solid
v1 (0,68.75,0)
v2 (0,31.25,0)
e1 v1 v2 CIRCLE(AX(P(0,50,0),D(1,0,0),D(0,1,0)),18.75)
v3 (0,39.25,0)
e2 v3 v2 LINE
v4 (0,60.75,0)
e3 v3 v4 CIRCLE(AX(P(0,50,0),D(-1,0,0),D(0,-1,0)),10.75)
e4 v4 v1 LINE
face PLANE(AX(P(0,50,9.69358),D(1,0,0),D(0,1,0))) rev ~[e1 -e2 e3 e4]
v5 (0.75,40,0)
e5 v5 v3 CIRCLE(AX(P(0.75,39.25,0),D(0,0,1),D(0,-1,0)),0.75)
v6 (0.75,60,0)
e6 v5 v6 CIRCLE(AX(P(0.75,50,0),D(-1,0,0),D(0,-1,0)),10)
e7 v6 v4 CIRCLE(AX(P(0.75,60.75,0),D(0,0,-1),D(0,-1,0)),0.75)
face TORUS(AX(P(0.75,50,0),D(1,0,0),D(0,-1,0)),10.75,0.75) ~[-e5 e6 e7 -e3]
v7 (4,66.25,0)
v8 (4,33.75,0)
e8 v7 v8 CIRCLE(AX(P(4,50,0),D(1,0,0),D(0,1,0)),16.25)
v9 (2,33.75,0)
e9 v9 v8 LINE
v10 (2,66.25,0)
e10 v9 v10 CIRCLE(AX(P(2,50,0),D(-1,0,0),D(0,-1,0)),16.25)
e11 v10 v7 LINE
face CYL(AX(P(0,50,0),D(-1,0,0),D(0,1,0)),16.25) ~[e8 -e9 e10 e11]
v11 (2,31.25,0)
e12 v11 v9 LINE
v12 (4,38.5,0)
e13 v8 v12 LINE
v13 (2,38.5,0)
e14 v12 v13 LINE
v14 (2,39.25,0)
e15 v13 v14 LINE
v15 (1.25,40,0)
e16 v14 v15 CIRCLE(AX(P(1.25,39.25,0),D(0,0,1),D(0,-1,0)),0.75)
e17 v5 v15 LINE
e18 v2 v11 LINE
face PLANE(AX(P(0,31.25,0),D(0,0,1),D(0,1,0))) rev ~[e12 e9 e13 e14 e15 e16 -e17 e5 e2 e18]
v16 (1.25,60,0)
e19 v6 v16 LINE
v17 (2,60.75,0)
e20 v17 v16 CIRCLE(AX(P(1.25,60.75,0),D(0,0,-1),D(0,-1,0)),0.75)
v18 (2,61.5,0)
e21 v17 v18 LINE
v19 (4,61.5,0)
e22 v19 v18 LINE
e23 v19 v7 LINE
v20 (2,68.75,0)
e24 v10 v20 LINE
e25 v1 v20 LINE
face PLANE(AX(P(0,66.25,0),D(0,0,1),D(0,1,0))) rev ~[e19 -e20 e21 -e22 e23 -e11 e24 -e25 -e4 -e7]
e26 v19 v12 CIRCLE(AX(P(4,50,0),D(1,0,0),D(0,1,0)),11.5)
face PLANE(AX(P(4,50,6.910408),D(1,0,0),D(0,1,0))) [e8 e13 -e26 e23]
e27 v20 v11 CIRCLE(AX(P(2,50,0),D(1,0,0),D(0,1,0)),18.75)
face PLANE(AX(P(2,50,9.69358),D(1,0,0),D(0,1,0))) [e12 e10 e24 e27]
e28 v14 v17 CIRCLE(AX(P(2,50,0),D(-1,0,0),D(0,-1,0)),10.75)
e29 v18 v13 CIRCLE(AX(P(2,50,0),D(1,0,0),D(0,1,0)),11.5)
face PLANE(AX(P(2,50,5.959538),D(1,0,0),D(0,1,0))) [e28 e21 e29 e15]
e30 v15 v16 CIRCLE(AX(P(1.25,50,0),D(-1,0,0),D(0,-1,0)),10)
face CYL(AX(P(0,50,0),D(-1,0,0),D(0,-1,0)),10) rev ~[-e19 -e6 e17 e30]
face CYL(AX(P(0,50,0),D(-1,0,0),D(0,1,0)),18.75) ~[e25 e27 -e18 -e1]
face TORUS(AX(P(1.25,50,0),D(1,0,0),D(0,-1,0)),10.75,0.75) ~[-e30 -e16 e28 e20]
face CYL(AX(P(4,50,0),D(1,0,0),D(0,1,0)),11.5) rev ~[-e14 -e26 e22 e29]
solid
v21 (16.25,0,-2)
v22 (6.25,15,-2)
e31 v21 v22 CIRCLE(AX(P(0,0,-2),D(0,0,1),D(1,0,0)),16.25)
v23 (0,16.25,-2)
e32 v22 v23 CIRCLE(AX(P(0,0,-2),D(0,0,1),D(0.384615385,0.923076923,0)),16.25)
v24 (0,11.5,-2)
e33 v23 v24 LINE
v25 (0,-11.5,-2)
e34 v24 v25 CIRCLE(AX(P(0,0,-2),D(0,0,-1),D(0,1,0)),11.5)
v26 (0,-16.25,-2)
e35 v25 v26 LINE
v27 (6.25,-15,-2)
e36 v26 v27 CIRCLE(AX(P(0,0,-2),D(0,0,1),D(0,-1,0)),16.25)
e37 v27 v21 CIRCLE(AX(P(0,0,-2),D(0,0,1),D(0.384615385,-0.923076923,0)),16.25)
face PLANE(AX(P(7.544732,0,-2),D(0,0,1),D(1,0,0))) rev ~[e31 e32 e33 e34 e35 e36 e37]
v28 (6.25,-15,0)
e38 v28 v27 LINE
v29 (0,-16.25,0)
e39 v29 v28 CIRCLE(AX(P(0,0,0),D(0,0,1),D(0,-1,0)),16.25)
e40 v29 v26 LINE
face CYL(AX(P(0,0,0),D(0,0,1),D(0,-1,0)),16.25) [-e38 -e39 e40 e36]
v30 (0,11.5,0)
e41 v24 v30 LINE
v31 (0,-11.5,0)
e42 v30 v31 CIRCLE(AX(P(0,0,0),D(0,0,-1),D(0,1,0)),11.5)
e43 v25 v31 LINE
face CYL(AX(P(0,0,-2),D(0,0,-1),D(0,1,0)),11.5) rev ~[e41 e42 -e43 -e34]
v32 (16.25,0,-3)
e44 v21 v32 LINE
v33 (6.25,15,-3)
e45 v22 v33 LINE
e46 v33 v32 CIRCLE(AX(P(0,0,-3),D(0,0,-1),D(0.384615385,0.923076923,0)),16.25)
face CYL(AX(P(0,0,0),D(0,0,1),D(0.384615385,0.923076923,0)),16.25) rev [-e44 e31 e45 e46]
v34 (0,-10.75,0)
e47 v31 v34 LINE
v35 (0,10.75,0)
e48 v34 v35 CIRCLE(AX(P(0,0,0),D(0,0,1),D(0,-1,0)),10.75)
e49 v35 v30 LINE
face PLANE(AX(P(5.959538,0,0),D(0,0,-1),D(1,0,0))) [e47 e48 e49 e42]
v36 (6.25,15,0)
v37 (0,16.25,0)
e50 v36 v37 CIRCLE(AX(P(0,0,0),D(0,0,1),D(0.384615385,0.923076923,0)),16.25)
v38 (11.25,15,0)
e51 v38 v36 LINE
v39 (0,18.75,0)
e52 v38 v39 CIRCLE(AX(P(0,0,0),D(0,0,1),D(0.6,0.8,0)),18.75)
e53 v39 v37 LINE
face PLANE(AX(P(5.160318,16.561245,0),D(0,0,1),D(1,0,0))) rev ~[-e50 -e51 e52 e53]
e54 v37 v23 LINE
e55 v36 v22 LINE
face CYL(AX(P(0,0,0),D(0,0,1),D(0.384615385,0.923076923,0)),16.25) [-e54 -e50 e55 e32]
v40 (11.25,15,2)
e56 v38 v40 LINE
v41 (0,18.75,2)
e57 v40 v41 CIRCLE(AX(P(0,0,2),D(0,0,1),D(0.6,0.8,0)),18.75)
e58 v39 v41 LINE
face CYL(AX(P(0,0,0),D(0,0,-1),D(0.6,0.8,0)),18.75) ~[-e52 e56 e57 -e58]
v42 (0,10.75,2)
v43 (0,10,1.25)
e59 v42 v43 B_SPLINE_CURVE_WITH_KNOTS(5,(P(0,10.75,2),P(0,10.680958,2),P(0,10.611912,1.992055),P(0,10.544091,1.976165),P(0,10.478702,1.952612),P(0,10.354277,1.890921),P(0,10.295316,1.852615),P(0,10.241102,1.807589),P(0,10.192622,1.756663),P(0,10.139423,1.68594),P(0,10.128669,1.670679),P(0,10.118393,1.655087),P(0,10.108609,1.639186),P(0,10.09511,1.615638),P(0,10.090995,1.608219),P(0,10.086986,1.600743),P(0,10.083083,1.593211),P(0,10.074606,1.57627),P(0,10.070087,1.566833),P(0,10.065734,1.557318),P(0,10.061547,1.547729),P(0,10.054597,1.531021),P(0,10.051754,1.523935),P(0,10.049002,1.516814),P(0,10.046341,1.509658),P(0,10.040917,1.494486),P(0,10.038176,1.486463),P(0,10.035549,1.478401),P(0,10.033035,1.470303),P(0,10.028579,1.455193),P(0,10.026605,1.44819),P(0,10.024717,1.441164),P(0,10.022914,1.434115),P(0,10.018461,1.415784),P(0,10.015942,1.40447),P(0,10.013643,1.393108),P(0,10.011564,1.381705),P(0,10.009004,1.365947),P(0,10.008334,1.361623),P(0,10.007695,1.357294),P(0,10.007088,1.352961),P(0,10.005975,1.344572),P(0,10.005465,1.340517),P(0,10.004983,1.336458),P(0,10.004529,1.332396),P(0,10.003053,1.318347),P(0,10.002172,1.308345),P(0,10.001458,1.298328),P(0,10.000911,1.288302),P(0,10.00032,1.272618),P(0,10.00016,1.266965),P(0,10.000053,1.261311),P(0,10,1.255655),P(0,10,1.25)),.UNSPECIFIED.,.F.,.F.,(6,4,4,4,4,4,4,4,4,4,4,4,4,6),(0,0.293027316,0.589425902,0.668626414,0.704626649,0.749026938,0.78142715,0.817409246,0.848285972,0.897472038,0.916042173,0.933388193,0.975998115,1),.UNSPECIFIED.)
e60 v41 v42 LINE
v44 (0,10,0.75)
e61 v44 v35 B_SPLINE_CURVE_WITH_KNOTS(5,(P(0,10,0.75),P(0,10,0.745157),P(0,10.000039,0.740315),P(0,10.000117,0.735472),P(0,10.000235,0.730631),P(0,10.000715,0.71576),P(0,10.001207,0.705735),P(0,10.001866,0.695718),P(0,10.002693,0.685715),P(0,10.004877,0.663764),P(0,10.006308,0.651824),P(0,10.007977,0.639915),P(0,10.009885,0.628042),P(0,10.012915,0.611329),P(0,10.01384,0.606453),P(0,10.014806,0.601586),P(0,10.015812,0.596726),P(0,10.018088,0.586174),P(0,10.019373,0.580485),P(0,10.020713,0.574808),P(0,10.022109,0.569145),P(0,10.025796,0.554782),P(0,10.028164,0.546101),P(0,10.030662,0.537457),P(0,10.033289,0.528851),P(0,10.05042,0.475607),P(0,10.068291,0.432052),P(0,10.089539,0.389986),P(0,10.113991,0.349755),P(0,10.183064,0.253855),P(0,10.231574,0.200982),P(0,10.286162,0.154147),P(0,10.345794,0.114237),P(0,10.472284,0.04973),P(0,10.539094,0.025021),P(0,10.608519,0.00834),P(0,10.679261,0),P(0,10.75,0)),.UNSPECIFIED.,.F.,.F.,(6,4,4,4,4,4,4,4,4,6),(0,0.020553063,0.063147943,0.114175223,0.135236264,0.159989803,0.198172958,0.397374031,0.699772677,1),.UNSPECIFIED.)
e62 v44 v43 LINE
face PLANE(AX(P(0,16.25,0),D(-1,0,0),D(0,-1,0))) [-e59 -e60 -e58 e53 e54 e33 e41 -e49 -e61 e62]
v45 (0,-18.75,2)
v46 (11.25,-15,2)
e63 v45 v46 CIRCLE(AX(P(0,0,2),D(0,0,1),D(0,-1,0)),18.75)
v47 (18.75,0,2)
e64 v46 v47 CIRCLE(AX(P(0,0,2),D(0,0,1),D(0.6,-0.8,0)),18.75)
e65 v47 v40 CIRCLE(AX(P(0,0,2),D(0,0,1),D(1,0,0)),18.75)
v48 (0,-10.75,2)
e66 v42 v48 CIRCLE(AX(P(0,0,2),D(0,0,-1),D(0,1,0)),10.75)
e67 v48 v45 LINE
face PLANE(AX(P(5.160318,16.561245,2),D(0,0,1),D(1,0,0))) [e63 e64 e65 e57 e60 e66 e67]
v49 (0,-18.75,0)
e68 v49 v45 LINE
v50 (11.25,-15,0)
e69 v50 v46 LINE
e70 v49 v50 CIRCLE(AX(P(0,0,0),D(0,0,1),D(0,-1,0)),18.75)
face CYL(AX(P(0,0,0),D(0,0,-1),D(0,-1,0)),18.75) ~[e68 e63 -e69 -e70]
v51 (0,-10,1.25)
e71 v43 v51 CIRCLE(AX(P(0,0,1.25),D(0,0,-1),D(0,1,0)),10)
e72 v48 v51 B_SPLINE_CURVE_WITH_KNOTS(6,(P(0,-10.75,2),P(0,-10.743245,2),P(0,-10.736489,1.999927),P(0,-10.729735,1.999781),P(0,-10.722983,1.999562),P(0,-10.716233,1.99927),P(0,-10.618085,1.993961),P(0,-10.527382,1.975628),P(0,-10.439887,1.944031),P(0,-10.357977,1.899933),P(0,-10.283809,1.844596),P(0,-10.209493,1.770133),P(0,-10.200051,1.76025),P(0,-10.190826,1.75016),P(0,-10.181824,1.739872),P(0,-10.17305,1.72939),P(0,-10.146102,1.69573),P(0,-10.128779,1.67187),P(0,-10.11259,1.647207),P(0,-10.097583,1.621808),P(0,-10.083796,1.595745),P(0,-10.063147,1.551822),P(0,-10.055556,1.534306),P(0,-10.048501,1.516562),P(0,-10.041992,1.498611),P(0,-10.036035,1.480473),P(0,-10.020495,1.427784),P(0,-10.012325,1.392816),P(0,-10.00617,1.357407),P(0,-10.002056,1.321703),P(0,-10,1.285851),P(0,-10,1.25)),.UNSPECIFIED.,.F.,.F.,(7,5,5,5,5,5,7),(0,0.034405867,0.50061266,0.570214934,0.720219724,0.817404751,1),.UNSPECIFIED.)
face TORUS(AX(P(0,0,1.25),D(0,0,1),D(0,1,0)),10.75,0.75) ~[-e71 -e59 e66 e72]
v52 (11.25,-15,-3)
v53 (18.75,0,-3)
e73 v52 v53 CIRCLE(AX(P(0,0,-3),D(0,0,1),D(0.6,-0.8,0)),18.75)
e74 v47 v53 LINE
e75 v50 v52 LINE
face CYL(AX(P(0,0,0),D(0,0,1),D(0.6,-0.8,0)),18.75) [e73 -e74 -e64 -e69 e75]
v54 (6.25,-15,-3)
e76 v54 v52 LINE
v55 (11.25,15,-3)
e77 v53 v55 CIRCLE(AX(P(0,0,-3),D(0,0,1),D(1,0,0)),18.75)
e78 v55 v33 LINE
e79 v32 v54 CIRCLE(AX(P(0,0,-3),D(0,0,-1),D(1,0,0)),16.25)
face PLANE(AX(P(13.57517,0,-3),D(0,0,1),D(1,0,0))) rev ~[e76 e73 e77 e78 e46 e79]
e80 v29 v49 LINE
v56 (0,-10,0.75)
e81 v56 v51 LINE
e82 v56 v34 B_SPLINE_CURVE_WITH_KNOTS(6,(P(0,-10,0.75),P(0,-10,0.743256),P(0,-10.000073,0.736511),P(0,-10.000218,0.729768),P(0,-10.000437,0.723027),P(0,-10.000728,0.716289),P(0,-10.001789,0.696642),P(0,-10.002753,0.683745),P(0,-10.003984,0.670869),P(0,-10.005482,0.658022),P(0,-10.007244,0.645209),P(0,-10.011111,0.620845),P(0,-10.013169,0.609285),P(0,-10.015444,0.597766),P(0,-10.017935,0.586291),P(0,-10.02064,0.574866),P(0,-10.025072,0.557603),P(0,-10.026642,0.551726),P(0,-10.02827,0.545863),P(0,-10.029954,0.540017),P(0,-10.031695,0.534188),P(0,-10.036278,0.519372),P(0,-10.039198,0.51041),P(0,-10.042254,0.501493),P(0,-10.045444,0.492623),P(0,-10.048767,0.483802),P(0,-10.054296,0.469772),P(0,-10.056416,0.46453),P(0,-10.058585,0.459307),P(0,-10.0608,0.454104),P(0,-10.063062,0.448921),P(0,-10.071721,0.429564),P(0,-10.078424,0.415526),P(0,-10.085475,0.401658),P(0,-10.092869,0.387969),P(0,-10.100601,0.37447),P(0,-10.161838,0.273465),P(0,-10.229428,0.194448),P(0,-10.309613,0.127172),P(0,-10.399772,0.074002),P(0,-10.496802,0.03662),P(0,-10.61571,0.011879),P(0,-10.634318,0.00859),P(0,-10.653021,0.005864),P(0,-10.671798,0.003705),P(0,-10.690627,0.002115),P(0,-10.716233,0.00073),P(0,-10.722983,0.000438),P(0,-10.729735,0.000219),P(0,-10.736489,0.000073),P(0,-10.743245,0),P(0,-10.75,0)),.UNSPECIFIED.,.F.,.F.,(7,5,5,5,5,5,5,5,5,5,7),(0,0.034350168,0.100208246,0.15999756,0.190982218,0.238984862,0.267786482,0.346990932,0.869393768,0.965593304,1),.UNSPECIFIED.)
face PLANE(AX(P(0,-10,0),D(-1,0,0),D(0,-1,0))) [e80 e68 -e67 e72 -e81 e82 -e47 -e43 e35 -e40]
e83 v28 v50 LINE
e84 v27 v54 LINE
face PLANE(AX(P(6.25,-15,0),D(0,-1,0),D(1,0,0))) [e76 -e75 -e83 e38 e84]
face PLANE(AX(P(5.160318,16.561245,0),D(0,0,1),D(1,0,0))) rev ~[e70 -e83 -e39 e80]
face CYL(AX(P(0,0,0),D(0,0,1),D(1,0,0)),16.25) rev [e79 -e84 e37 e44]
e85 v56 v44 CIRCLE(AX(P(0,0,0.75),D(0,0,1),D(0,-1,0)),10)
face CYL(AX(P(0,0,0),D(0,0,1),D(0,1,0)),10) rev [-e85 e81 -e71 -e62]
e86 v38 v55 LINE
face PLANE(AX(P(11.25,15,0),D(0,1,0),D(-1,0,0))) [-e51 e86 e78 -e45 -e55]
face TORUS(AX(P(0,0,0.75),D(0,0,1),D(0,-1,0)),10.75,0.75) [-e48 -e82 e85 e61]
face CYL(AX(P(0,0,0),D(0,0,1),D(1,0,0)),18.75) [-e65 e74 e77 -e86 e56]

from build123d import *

# Parameters (mm, degrees)
F1_DEPTH  = 2
F2_DEPTH  = 3
F3_DEPTH  = 2
F5_DEPTH  = 4
F6_DEPTH  = 2
F8_DEPTH  = 2
F9_R      = 0.75
F11_DEPTH = 2
F12_R     = 0.75


with BuildPart() as f1:
    # F0 (on Top) → F1 (new body)
    with BuildSketch(Plane.XY):
        with BuildLine():
            ThreePointArc((0, 16.25), (3.186887196, 15.93443598), (6.25, 15))
            Line((6.25, 15), (11.25, 15))
            ThreePointArc((11.25, 15), (5.9292706128, 17.7878118384), (0, 18.75))
            Line((0, 18.75), (0, 16.25))
        make_face()
        with BuildLine():
            ThreePointArc((6.25, 15), (13.520817283, 9.0138781887), (16.25, 0))
            ThreePointArc((16.25, 0), (13.520817283, -9.0138781887), (6.25, -15))
            Line((6.25, -15), (11.25, -15))
            ThreePointArc((11.25, -15), (16.7705098312, -8.3852549156), (18.75, 0))
            ThreePointArc((18.75, 0), (16.7705098312, 8.3852549156), (11.25, 15))
            Line((11.25, 15), (6.25, 15))
        make_face()
        with BuildLine():
            Line((11.25, -15), (6.25, -15))
            ThreePointArc((6.25, -15), (3.186887196, -15.93443598), (0, -16.25))
            Line((0, -16.25), (0, -18.75))
            ThreePointArc((0, -18.75), (5.9292706128, -17.7878118384), (11.25, -15))
        make_face()
        with BuildLine():
            ThreePointArc((6.25, -15), (13.520817283, -9.0138781887), (16.25, 0))
            ThreePointArc((16.25, 0), (13.520817283, 9.0138781887), (6.25, 15))
            ThreePointArc((6.25, 15), (3.186887196, 15.93443598), (0, 16.25))
            Line((0, 16.25), (0, 10))
            ThreePointArc((0, 10), (7.0710678119, 7.0710678119), (10, 0))
            ThreePointArc((10, 0), (7.0710678119, -7.0710678119), (0, -10))
            Line((0, -10), (0, -16.25))
            ThreePointArc((0, -16.25), (3.186887196, -15.93443598), (6.25, -15))
        make_face()
    extrude(amount=F1_DEPTH)

    # F0 (on Top) → F2 (join)
    with BuildSketch(Plane.XY):
        with BuildLine():
            ThreePointArc((6.25, 15), (13.520817283, 9.0138781887), (16.25, 0))
            ThreePointArc((16.25, 0), (13.520817283, -9.0138781887), (6.25, -15))
            Line((6.25, -15), (11.25, -15))
            ThreePointArc((11.25, -15), (16.7705098312, -8.3852549156), (18.75, 0))
            ThreePointArc((18.75, 0), (16.7705098312, 8.3852549156), (11.25, 15))
            Line((11.25, 15), (6.25, 15))
        make_face()
    extrude(amount=-F2_DEPTH)

    # F0 (on Top) → F3 (join)
    with BuildSketch(Plane.XY):
        with BuildLine():
            ThreePointArc((6.25, -15), (13.520817283, -9.0138781887), (16.25, 0))
            ThreePointArc((16.25, 0), (13.520817283, 9.0138781887), (6.25, 15))
            ThreePointArc((6.25, 15), (3.186887196, 15.93443598), (0, 16.25))
            Line((0, 16.25), (0, 10))
            ThreePointArc((0, 10), (7.0710678119, 7.0710678119), (10, 0))
            ThreePointArc((10, 0), (7.0710678119, -7.0710678119), (0, -10))
            Line((0, -10), (0, -16.25))
            ThreePointArc((0, -16.25), (3.186887196, -15.93443598), (6.25, -15))
        make_face()
    extrude(amount=-F3_DEPTH)

    # F10 (on face) → F11 (cut)
    with BuildSketch(Plane(origin=(0, 0, -2), x_dir=(1, 0, 0), z_dir=(0, 0, -1))):
        with BuildLine():
            Line((0, -10), (0, -11.5))
            ThreePointArc((0, -11.5), (11.5, 0), (0, 11.5))
            Line((0, 11.5), (0, 10))
            ThreePointArc((0, 10), (10, 0), (0, -10))
        make_face()
    extrude(amount=-F11_DEPTH, mode=Mode.SUBTRACT)

    # F12
    f12_edges = [f1.edges().sort_by_distance(p)[0] for p in [
        (10, 0, 0),
        (10, 0, 2),
    ]]
    fillet(f12_edges, radius=F12_R)


with BuildPart() as f5:
    # F4 (on Right) → F5 (new body)
    with BuildSketch(Plane.YZ):
        with BuildLine():
            Line((60, 0), (66.25, 0))
            ThreePointArc((66.25, 0), (50, 16.25), (33.75, 0))
            Line((33.75, 0), (40, 0))
            ThreePointArc((40, 0), (50, 10), (60, 0))
        make_face()
    extrude(amount=F5_DEPTH)

    # F4 (on Right) → F6 (join)
    with BuildSketch(Plane.YZ):
        with BuildLine():
            Line((66.25, 0), (68.75, 0))
            ThreePointArc((68.75, 0), (50, 18.75), (31.25, 0))
            Line((31.25, 0), (33.75, 0))
            ThreePointArc((33.75, 0), (50, 16.25), (66.25, 0))
        make_face()
    extrude(amount=F6_DEPTH)

    # F7 (on face) → F8 (cut)
    with BuildSketch(Plane.YZ.offset(4)):
        with BuildLine():
            Line((60, 0), (61.5, 0))
            ThreePointArc((61.5, 0), (50, 11.5), (38.5, 0))
            Line((38.5, 0), (40, 0))
            ThreePointArc((40, 0), (50, 10), (60, 0))
        make_face()
    extrude(amount=-F8_DEPTH, mode=Mode.SUBTRACT)

    # F9
    f9_edges = [f5.edges().sort_by_distance(p)[0] for p in [
        (0, 50, 10),
        (2, 50, 10),
    ]]
    fillet(f9_edges, radius=F9_R)


solid = Compound([f1.part, f5.part])
